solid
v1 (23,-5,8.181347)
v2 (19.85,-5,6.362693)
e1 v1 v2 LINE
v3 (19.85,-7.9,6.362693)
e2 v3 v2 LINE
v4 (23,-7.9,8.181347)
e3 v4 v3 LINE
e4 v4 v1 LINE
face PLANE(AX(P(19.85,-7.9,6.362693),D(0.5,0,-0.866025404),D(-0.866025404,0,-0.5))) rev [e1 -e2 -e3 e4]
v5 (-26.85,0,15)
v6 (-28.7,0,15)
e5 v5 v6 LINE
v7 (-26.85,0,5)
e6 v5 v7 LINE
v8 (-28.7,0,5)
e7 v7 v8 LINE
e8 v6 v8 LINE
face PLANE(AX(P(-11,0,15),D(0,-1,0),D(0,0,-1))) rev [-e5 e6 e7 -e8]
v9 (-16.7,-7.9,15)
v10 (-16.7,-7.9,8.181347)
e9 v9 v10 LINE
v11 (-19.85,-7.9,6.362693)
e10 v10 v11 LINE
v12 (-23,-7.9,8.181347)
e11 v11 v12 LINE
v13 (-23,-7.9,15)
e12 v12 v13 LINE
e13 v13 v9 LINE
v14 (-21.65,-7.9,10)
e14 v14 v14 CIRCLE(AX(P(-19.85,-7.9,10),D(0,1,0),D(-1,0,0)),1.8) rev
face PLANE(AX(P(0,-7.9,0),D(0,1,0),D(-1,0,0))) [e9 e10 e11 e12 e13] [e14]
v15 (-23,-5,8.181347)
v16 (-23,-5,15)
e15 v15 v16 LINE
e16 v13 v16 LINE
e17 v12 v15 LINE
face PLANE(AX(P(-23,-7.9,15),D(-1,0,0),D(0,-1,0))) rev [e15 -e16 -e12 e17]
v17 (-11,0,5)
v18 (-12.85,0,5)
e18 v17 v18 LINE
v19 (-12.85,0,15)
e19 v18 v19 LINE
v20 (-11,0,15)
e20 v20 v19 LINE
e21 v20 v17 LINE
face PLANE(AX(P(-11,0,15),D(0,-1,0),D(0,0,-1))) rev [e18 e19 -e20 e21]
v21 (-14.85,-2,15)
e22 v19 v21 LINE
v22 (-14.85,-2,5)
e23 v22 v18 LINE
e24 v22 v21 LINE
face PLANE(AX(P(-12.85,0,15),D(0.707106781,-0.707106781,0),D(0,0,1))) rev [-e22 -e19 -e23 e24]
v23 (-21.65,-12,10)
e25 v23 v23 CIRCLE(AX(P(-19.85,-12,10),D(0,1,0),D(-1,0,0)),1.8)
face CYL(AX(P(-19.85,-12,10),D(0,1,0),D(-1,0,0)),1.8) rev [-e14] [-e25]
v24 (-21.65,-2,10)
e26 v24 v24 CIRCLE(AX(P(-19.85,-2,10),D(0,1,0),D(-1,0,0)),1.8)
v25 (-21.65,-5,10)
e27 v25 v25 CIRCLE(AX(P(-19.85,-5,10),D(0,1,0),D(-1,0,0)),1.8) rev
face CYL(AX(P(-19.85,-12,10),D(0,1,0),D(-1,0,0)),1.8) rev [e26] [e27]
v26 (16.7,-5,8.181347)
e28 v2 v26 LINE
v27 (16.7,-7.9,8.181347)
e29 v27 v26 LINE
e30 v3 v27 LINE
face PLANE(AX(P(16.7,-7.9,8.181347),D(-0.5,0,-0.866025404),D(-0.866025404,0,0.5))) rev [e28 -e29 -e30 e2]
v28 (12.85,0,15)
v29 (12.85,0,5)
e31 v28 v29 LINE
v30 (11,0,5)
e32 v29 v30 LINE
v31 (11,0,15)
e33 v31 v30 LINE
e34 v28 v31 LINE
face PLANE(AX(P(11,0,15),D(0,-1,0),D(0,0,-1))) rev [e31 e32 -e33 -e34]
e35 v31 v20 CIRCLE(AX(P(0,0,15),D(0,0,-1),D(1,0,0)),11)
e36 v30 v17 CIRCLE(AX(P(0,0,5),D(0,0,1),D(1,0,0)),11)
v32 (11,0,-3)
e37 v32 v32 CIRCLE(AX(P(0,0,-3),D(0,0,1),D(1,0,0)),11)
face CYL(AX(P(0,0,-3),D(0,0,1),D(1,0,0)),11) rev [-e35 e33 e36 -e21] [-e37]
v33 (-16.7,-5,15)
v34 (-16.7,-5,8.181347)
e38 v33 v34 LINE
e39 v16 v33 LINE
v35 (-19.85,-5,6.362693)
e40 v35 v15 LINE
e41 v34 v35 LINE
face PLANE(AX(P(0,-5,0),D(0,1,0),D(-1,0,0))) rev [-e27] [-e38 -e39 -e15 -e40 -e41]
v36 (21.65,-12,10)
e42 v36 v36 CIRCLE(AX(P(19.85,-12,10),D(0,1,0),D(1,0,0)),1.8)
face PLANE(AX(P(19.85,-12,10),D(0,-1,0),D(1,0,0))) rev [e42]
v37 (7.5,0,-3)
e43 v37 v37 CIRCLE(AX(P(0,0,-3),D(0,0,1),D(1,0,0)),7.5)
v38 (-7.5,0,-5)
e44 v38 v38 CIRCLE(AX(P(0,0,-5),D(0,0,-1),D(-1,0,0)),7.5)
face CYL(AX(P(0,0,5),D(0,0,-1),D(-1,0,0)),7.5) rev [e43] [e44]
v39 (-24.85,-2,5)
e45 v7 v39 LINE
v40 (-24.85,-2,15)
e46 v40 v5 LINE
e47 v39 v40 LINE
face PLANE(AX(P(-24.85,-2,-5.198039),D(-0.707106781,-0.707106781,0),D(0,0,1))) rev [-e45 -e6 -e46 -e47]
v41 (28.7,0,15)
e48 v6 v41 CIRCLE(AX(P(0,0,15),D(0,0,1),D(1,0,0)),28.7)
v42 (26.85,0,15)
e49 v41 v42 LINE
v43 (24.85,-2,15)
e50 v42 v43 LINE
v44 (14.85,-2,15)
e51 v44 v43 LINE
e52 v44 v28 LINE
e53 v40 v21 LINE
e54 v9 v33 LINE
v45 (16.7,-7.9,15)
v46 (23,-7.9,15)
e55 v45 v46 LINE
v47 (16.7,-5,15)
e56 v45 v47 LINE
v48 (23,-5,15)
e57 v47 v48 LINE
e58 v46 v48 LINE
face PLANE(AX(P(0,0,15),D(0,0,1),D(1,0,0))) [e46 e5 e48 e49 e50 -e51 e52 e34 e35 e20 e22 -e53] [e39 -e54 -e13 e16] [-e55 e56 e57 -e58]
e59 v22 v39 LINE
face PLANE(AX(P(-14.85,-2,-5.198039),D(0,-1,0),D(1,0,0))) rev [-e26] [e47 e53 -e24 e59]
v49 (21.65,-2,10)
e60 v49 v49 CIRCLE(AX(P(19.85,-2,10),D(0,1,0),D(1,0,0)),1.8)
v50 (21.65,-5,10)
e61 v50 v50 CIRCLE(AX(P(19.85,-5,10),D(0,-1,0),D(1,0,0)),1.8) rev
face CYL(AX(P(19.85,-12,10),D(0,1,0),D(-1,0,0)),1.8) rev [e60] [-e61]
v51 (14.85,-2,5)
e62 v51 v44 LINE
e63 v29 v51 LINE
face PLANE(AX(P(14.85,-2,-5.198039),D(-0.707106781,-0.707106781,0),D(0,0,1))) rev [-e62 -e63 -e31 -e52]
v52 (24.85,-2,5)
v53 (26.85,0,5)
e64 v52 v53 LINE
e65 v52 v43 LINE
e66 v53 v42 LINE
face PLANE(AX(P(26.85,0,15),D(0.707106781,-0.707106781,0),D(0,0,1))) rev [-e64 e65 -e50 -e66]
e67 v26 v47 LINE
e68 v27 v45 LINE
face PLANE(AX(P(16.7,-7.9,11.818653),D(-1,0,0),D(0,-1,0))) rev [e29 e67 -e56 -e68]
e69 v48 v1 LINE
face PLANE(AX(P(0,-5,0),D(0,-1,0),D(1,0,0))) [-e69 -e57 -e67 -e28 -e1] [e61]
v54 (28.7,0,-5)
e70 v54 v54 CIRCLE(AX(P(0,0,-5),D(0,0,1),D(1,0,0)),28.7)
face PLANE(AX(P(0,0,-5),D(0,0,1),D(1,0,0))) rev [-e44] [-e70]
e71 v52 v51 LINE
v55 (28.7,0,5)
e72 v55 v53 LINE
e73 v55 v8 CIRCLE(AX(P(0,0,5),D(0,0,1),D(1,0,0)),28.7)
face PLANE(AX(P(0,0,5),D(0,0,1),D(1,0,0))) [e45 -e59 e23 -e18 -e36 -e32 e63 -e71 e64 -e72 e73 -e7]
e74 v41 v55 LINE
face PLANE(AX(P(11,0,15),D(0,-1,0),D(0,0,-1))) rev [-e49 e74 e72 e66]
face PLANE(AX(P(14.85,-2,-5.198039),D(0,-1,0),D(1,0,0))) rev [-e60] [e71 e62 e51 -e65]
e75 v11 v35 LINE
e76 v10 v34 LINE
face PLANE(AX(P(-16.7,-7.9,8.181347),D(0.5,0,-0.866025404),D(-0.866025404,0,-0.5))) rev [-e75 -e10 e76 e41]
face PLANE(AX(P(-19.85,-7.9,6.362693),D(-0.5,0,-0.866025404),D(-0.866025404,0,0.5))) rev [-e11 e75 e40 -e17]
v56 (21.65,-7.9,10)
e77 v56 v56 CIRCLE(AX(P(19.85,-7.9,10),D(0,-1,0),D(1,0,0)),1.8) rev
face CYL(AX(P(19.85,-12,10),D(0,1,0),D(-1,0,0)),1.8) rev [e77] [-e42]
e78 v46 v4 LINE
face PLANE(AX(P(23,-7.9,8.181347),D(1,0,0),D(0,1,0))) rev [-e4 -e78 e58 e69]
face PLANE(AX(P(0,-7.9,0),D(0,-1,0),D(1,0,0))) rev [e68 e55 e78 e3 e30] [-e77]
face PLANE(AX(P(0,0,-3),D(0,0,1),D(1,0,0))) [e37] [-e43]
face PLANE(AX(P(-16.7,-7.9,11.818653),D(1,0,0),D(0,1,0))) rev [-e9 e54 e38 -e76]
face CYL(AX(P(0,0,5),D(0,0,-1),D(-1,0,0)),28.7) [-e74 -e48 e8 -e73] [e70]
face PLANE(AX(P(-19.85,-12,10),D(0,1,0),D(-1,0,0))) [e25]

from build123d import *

# Parameters (mm, degrees)
ESBO_O1_R                = 28.7
RESSALTO_EXTRUS_O1_DEPTH = 5
ESBO_O2_R                = 11
CORTE_EXTRUS_O1_DEPTH    = 8
ESBO_O3_R                = 7.5
CORTE_EXTRUS_O2_DEPTH    = 42.801674608
RESSALTO_EXTRUS_O4_START = 10
RESSALTO_EXTRUS_O4_DEPTH = 10
ESBO_O9_W                = 10
ESBO_O9_H                = 2
CORTE_EXTRUS_O5_DEPTH    = 10
CHANFRO1_SIZE            = 2
ESBO_O10_R               = 1.8
CORTE_EXTRUS_O6_DEPTH    = 10
CORTE_EXTRUS_O7_START    = -3
CORTE_EXTRUS_O7_DEPTH    = 2.9


with BuildPart() as part:
    # Esboço1 → Ressalto-extrusão1 (new, symmetric)
    with BuildSketch(Plane.XY):
        Circle(ESBO_O1_R)
    extrude(amount=RESSALTO_EXTRUS_O1_DEPTH, both=True)

    # Esboço2 → Corte-extrusão1 (cut)
    with BuildSketch(Plane.XY.offset(5)):
        Circle(ESBO_O2_R)
    extrude(amount=-CORTE_EXTRUS_O1_DEPTH, mode=Mode.SUBTRACT)

    # Esboço3 → Corte-extrusão2 (cut, through all)
    with BuildSketch(Plane(origin=(0, 0, -5), x_dir=(-1, 0, 0), z_dir=(0, 0, -1))):
        Circle(ESBO_O3_R)
    extrude(amount=-CORTE_EXTRUS_O2_DEPTH, mode=Mode.SUBTRACT)

    # Esboço8 → Ressalto-extrusão4 (add)
    with BuildSketch(Plane.XY.offset(5).offset(RESSALTO_EXTRUS_O4_START)):
        with BuildLine():
            Line((-11, 0), (-28.7, 0))
            ThreePointArc((-28.7, 0), (0, -28.7), (28.7, 0))
            Line((28.7, 0), (11, 0))
            ThreePointArc((11, 0), (0, -11), (-11, 0))
        make_face()
    extrude(amount=-RESSALTO_EXTRUS_O4_DEPTH)

    # Esboço9 → Corte-extrusão5 (cut)
    with BuildSketch(Plane.XY.offset(15)):
        with Locations((-19.85, -1)):
            Rectangle(ESBO_O9_W, ESBO_O9_H)
        with Locations((19.85, -1)):
            Rectangle(ESBO_O9_W, ESBO_O9_H)
    extrude(amount=-CORTE_EXTRUS_O5_DEPTH, mode=Mode.SUBTRACT)

    # Chanfro1
    chanfro1_edges = [part.edges().sort_by_distance(p)[0] for p in [
        (24.85, 0, 10),
        (14.85, 0, 10),
        (-14.85, 0, 10),
        (-24.85, 0, 10),
    ]]
    chamfer(chanfro1_edges, length=CHANFRO1_SIZE - 0.0001)  # a hair under: the kernel refuses the full size

    # Esboço10 → Corte-extrusão6 (cut)
    with BuildSketch(Plane(origin=(0, -2, 0), x_dir=(1, 0, 0), z_dir=(0, 1, 0))):
        with Locations(Location((-19.85, -10, 0), (0, 0, 180))):
            Circle(ESBO_O10_R)
        with Locations((19.85, -10)):
            Circle(ESBO_O10_R)
    extrude(amount=-CORTE_EXTRUS_O6_DEPTH, mode=Mode.SUBTRACT)

    # Esboço11 → Corte-extrusão7 (cut)
    with BuildSketch(Plane(origin=(0, -2, 0), x_dir=(1, 0, 0), z_dir=(0, 1, 0)).offset(CORTE_EXTRUS_O7_START)):
        Polygon((-23, -8.181346652), (-23, -11.818653348), (-23, -15), (-16.7, -15), (-16.7, -11.818653348), (-16.7, -8.181346652), (-19.85, -6.362693304), align=None)
        Polygon((23, -15), (23, -11.818653348), (23, -8.181346652), (19.85, -6.362693304), (16.7, -8.181346652), (16.7, -11.818653348), (16.7, -15), align=None)
    extrude(amount=-CORTE_EXTRUS_O7_DEPTH, mode=Mode.SUBTRACT)


solid = part.part
